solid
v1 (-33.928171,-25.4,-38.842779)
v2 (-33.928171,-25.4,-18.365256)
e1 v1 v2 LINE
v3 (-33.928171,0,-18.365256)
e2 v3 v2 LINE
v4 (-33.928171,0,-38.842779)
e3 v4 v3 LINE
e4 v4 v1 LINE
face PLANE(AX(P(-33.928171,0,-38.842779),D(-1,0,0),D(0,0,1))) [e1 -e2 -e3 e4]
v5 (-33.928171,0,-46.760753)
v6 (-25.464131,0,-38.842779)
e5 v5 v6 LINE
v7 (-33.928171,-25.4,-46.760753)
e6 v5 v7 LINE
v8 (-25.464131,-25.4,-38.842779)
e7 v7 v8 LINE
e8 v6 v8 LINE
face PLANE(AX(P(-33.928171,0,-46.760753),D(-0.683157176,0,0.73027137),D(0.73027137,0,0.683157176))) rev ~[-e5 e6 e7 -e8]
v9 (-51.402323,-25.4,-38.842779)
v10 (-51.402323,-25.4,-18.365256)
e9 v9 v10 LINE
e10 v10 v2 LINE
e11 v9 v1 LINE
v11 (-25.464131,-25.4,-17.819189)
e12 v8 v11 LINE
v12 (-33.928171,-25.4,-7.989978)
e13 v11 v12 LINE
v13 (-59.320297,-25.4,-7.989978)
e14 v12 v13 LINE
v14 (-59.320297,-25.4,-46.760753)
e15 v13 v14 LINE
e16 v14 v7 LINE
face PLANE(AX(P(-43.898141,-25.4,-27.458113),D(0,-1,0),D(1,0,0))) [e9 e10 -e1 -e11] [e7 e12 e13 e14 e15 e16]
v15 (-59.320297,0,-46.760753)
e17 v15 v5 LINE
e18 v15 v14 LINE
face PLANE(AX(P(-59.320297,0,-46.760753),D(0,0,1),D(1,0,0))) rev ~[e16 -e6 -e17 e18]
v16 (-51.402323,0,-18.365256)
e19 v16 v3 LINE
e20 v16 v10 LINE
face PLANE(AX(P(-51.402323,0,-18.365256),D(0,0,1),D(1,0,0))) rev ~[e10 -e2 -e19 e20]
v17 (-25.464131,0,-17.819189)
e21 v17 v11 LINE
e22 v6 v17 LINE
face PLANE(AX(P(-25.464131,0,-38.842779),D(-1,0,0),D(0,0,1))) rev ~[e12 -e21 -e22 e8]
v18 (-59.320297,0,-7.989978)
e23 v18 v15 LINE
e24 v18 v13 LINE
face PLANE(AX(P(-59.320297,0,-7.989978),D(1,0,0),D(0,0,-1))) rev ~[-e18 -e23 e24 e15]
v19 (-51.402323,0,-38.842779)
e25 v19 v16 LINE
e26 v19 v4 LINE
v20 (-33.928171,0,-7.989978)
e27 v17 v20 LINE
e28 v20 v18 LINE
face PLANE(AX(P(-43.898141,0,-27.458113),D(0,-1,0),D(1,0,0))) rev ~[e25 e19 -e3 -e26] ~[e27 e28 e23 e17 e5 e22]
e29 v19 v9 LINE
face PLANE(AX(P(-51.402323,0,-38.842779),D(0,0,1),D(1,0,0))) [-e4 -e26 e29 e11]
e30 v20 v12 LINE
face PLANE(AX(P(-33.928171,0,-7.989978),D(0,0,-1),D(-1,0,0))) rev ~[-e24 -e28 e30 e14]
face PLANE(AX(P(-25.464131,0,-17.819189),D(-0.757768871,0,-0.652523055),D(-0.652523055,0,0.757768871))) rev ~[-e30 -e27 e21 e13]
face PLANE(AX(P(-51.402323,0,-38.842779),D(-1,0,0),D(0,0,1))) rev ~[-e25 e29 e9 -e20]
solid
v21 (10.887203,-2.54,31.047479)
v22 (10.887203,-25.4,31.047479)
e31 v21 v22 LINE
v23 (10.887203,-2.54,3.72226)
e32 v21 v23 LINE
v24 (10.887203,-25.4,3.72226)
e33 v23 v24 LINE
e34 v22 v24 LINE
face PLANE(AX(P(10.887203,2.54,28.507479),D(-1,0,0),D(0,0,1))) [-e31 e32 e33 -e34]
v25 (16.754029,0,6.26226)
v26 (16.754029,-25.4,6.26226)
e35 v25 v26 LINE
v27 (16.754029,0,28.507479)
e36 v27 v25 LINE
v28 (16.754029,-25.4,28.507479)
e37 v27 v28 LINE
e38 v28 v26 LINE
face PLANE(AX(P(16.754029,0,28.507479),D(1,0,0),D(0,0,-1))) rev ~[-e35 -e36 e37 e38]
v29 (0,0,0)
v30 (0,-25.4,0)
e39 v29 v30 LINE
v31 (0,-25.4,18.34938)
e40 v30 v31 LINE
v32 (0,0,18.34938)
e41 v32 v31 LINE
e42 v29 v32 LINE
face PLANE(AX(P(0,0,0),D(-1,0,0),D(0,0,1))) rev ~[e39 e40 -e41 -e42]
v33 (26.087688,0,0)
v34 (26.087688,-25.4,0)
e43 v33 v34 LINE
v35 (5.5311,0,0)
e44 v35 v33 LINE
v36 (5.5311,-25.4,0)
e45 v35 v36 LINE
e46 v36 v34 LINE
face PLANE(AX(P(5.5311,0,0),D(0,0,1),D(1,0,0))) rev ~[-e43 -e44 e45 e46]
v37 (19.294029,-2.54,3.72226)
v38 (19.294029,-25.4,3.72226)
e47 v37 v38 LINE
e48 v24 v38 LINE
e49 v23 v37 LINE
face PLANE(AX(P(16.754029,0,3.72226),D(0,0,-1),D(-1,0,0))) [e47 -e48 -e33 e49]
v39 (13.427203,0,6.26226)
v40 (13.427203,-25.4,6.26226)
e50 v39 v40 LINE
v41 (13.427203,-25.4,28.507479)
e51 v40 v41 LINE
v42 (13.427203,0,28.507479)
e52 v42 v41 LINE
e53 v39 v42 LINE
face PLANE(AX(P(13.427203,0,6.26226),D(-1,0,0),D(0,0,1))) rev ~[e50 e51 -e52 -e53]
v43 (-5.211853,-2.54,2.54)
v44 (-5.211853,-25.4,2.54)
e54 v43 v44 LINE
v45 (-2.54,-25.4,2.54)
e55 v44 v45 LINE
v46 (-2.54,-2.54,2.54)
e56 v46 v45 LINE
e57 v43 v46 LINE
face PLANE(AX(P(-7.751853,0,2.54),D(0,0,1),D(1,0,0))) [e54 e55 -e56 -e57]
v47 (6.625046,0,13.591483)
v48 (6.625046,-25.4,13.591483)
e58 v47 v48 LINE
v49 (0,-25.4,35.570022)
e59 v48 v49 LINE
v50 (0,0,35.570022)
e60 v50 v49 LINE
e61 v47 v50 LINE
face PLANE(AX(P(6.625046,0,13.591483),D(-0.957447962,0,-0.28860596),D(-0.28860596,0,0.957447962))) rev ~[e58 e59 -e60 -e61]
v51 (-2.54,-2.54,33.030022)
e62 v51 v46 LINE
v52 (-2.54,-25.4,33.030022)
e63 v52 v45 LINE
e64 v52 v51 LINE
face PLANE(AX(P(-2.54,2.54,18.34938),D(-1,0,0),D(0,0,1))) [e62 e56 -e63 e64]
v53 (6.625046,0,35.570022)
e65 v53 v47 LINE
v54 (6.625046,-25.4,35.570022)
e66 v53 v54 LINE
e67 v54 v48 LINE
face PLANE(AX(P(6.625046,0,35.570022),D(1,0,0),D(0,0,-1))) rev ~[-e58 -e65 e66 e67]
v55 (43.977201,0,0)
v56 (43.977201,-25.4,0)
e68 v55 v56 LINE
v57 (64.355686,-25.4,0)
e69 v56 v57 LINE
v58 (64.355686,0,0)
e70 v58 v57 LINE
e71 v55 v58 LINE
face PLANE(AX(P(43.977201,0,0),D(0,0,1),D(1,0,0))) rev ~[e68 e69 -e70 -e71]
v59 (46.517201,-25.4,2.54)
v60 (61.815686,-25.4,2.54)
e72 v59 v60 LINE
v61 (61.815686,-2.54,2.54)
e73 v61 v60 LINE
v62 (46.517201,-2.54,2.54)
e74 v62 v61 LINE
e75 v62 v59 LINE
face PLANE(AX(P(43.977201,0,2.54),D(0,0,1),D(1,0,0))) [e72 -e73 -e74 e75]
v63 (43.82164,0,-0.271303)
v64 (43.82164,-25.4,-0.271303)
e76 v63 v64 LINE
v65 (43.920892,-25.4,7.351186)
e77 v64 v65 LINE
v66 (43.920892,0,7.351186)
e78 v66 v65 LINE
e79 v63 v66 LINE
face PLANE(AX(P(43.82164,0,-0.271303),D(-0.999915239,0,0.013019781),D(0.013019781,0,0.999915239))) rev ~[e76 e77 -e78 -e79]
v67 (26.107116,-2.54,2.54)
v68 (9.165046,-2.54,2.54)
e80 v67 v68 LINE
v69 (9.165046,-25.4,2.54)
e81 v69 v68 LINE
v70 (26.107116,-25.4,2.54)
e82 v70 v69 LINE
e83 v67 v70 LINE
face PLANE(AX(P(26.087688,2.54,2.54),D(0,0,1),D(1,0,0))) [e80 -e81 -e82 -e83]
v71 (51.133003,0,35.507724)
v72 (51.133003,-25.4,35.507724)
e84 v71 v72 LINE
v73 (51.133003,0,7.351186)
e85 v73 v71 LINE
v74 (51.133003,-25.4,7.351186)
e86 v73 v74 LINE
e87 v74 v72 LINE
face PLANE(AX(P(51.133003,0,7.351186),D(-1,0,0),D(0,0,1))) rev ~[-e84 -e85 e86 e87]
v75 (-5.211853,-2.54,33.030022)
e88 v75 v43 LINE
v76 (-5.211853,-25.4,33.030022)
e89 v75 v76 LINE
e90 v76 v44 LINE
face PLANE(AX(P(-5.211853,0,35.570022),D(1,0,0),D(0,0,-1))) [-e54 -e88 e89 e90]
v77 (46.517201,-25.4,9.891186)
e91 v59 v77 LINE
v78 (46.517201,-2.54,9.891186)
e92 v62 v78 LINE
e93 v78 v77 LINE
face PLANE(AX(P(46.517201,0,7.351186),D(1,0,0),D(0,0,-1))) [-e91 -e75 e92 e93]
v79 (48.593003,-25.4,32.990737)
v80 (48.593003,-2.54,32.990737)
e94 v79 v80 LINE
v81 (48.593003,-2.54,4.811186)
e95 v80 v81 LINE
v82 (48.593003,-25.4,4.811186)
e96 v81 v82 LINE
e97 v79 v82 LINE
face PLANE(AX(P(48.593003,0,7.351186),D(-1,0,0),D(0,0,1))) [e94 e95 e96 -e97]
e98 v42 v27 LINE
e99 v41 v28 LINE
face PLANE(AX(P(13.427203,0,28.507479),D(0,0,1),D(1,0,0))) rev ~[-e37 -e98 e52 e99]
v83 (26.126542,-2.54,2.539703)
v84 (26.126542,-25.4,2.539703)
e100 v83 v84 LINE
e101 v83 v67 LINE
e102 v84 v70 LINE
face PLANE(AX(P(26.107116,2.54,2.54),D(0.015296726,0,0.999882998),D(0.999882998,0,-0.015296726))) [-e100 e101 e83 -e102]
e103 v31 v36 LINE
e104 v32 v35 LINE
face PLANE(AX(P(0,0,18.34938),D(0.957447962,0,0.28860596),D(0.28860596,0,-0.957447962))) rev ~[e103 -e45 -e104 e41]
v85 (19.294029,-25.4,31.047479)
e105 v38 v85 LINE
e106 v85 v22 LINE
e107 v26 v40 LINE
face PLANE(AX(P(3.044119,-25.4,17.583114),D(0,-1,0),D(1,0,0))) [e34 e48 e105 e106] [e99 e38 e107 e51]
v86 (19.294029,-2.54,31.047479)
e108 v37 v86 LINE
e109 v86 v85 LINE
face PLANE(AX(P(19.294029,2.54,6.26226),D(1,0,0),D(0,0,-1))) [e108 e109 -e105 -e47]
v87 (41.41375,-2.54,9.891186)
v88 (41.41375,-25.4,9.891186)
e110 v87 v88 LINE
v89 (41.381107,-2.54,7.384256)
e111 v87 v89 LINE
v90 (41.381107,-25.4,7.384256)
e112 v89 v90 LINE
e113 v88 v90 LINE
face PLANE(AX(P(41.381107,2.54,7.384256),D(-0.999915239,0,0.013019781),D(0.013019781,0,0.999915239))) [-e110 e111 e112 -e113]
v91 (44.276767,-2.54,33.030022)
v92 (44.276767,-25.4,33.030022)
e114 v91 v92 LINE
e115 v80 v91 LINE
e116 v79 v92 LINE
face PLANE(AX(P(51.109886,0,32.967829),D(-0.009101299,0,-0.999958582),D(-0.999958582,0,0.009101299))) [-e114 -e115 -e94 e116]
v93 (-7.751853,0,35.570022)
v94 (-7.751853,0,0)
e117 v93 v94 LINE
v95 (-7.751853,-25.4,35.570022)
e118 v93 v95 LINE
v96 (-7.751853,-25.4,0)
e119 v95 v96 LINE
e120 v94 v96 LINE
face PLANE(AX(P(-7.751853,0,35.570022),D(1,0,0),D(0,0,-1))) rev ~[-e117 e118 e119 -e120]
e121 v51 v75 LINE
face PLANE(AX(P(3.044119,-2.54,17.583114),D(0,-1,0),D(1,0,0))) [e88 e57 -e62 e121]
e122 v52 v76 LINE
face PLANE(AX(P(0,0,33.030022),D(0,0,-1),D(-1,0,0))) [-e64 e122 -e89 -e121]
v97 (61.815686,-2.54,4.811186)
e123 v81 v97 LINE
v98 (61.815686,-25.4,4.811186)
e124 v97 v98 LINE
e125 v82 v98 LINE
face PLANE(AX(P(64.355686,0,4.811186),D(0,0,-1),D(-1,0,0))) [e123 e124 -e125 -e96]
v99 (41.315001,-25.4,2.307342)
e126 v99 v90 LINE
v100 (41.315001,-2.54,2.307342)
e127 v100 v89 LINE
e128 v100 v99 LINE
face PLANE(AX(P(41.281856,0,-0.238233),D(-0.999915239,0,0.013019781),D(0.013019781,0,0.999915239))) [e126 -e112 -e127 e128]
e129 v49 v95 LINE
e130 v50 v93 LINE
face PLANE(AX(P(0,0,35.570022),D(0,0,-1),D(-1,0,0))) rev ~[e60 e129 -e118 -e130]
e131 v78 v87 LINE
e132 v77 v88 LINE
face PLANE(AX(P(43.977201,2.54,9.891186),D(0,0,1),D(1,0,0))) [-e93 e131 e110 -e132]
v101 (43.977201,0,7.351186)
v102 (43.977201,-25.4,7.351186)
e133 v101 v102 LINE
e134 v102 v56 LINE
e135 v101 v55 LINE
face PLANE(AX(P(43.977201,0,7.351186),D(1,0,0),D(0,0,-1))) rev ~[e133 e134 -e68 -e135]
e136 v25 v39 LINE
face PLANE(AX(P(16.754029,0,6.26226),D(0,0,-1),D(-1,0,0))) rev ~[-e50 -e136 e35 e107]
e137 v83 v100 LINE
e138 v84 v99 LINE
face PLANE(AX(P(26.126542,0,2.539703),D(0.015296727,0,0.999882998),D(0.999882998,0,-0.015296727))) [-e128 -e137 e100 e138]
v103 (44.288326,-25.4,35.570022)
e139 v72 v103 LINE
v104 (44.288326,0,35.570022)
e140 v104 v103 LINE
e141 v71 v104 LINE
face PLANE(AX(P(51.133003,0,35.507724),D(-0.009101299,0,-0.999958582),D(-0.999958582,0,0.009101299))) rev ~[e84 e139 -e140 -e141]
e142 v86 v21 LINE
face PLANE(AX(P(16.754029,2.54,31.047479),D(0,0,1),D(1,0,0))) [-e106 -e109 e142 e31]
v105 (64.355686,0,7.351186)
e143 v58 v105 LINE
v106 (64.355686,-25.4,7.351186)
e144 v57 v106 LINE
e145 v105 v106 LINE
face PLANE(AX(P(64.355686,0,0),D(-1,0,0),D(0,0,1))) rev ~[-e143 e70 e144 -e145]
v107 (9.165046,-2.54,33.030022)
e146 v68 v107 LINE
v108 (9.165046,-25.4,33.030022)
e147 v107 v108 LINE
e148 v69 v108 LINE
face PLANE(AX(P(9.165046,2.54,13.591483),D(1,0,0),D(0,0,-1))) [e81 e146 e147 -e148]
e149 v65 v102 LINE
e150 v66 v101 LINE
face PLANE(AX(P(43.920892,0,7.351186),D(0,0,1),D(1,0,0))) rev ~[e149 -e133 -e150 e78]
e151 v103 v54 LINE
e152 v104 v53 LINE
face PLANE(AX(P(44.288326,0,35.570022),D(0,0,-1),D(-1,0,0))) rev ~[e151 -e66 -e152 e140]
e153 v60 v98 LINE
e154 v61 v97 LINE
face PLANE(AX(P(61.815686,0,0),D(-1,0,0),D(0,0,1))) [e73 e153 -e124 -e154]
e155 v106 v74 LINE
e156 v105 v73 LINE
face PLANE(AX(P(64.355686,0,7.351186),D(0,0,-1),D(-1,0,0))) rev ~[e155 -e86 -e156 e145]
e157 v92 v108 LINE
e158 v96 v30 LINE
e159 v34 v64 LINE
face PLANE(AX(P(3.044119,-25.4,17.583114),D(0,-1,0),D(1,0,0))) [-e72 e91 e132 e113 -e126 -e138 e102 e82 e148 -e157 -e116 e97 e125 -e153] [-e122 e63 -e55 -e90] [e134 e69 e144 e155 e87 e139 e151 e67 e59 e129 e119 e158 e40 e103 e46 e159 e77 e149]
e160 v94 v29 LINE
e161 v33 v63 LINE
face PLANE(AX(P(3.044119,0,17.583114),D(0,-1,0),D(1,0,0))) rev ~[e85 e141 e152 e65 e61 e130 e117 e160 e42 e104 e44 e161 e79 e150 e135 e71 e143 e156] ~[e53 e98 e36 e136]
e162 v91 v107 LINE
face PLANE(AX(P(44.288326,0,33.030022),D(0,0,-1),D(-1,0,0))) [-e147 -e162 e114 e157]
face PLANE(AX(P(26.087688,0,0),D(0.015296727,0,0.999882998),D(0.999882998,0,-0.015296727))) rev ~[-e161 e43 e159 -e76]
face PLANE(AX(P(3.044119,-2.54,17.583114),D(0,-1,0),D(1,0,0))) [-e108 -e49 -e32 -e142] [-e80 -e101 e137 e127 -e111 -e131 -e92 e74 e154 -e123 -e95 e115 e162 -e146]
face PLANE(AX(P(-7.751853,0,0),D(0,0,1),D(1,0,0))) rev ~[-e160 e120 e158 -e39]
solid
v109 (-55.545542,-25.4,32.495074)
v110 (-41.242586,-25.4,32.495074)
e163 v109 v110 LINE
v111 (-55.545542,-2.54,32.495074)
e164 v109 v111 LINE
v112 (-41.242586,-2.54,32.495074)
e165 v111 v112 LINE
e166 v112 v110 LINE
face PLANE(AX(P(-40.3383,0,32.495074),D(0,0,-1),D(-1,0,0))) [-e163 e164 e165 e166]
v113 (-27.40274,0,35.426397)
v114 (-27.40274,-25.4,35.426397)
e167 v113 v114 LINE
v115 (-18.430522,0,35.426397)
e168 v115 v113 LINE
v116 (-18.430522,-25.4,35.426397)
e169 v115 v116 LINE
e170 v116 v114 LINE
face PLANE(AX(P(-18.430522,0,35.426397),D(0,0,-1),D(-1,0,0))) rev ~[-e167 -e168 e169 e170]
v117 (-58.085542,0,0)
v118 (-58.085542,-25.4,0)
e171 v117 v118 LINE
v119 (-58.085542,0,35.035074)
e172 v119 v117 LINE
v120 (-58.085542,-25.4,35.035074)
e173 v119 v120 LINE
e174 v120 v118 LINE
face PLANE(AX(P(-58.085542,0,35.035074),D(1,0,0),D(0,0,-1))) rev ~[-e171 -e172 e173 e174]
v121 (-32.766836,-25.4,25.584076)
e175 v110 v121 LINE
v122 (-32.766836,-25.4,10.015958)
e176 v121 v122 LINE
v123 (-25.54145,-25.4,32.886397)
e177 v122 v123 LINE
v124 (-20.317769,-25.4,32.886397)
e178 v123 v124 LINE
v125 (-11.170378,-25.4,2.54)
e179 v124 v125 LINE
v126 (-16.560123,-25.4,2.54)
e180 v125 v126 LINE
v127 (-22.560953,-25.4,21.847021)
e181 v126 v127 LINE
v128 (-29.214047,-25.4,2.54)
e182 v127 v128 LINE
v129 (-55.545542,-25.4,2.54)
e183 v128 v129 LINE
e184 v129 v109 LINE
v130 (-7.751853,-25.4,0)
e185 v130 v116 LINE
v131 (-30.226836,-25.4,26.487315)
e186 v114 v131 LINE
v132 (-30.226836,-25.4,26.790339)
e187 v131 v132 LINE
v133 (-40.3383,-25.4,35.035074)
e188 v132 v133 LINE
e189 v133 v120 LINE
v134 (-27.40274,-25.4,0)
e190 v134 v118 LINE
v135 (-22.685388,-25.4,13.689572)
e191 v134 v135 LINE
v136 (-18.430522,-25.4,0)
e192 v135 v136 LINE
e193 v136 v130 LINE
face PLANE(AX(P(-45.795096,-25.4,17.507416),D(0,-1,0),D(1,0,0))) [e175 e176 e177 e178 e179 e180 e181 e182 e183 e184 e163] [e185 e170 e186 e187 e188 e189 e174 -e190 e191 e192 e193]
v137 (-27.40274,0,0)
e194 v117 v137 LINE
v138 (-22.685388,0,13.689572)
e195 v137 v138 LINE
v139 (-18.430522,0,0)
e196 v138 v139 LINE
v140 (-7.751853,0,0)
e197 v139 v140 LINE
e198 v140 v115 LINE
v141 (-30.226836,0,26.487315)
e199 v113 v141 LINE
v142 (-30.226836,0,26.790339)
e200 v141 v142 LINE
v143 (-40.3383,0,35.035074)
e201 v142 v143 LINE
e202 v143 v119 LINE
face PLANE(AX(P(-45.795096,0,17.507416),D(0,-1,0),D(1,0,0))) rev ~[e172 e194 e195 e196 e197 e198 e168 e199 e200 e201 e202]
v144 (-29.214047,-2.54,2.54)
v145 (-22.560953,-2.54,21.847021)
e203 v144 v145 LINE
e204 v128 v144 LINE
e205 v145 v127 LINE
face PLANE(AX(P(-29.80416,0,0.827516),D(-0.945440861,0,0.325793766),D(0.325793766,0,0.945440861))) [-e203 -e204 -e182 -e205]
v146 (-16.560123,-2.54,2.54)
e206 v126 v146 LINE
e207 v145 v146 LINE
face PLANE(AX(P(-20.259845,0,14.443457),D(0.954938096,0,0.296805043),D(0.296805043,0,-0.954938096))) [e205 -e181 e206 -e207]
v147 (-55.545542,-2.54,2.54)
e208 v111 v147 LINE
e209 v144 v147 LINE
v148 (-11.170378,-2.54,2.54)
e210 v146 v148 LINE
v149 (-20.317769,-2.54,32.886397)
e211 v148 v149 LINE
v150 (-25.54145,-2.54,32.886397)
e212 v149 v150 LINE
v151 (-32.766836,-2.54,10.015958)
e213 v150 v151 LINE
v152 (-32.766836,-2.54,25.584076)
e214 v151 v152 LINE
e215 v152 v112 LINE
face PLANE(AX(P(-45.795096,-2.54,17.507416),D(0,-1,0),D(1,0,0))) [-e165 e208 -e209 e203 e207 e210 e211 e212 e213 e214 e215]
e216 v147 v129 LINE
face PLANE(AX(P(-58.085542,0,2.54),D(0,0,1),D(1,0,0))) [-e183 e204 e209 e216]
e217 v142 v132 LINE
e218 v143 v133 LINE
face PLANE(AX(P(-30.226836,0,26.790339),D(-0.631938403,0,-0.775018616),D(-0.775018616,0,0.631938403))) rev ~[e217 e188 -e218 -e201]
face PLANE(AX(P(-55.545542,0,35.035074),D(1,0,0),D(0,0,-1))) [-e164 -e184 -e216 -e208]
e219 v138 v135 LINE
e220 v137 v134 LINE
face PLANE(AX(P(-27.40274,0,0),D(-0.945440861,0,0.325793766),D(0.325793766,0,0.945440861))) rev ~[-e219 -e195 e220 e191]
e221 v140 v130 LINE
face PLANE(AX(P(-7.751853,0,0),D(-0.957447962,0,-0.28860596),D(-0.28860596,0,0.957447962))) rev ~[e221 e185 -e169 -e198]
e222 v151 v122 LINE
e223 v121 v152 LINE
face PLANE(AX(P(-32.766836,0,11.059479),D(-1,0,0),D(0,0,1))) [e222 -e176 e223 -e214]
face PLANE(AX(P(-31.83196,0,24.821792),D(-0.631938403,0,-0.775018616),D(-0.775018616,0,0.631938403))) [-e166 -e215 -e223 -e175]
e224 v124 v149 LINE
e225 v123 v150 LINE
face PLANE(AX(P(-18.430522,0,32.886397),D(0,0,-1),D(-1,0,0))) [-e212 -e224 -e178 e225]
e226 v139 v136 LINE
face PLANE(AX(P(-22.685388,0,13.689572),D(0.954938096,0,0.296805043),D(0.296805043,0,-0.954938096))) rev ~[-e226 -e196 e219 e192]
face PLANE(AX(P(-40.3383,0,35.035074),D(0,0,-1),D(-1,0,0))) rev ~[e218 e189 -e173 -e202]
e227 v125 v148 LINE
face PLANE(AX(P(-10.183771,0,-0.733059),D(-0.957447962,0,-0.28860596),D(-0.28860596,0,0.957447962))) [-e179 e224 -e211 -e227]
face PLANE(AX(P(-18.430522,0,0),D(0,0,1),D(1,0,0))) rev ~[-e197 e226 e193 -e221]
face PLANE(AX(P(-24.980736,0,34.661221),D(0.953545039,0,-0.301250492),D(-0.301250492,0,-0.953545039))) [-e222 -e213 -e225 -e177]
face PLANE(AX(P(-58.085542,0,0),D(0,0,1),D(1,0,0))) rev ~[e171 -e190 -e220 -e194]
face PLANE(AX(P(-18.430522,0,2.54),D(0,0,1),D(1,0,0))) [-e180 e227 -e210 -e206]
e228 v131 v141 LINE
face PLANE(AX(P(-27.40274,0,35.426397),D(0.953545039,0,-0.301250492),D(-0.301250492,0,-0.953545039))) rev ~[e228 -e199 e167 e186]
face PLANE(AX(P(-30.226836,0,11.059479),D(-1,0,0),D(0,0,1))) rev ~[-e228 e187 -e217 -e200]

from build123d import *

# Parameters (mm, degrees)
F1_DEPTH    = 25.4
F3_DEPTH    = 25.4
F4_T        = -2.54
F5_T        = 2.54
F5_T3_DEPTH = 30.48
F6_W        = 17.4741521478
F6_H        = 20.4775221646
F7_DEPTH    = 25.4


# Not quite as in the source:
# - a shell that OpenCascade refuses in one call is made with other operations: the cavity is built on its own and cut out


with BuildPart() as f1:
    # F0 (on Front) → F1 (new body)
    with BuildSketch(Plane.XZ):
        Polygon((-7.751853343, 35.5700217187), (-7.751853343, 0), (0, 0), (0, 18.349380202), (5.5311000617, 0), (13.4272025898, 0), (13.4272025898, 5.9511377476), (13.4272025898, 6.2622595578), (13.4272025898, 28.5074785352), (13.4272025898, 35.5700217187), (6.6250464879, 35.5700217187), (6.6250464879, 13.591483), (0, 35.5700217187), align=None)
        Polygon((13.4272025898, 5.9511377476), (13.4272025898, 0), (26.0876882821, 0), (43.8216403127, -0.2713031718), (43.9208918573, 7.3511856608), (44.1983910351, 28.6630392075), (44.2883260548, 35.5700217187), (26.0876882821, 35.5700217187), (13.4272025898, 35.5700217187), (13.4272025898, 28.5074785352), (16.7540293187, 28.5074785352), (16.7540293187, 6.2622595578), (13.4272025898, 6.2622595578), align=None)
        Polygon((51.1330030859, 35.5077236891), (44.2883260548, 35.5700217187), (44.2883260548, 28.6630392075), (44.1983910351, 28.6630392075), (43.9208918573, 7.3511856608), (43.977200985, 7.3511856608), (43.977200985, 0), (64.355686307, 0), (64.355686307, 7.3511856608), (51.1330030859, 7.3511856608), align=None)
        Polygon((44.2883260548, 28.6630392075), (44.2883260548, 35.5700217187), (44.1983910351, 28.6630392075), align=None)
    extrude(amount=F1_DEPTH)

    # F5: shell of thickness 2.54, made by hand


with BuildPart() as f1b:
    # F0 (on Front) → F1, piece 2 (new body)
    with BuildSketch(Plane.XZ):
        Polygon((-27.4027399719, 35.4263968766), (-38.5948903859, 0), (-27.4027399719, 0), (-22.6853881031, 13.6895719916), (-18.4305217117, 0), (-7.751853343, 0), (-18.4305217117, 35.4263968766), align=None)
    extrude(amount=F1_DEPTH)

    # F2 (on Front) → F3 (join)
    with BuildSketch(Plane.XZ):
        Polygon((-58.0855421722, 35.0350737572), (-58.0855421722, 0), (-38.4715683758, 0), (-30.226835981, 11.0594791437), (-30.226835981, 26.7903394997), (-40.3383001685, 35.0350737572), align=None)
    extrude(amount=F3_DEPTH)

    # F4
    f4_openings = [f1b.faces().sort_by_distance(p)[0] for p in [
        (-36.054344, -25.4, 16.831568),
    ]]
    offset(amount=F4_T, openings=f4_openings, kind=Kind.INTERSECTION)


with BuildPart() as f5_core1:
    # F5_t2: copy of F1
    add(f1.part)

    # the walls: a layer under each face that stays
    f5_faces = [f5_core1.faces().sort_by_distance(p)[0] for p in [
        (47.7106645703, -12.7, 35.5388727039),
        (25.4566862714, -12.7, 35.5700217187),
        (6.6250464879, -12.7, 24.5807523594),
        (3.3125232439, -12.7, 24.5807523594),
        (-3.8759266715, -12.7, 35.5700217187),
        (-7.751853343, -12.7, 17.7850108594),
        (-3.8759266715, -12.7, 0),
        (0, -12.7, 9.174690101),
        (2.7655500308, -12.7, 9.174690101),
        (15.8093941719, -12.7, 0),
        (34.9546642974, -12.7, -0.1356515859),
        (43.871266085, -12.7, 3.5399412445),
        (43.9490464211, -12.7, 7.3511856608),
        (43.977200985, -12.7, 3.6755928304),
        (54.166443646, -12.7, 0),
        (64.355686307, -12.7, 3.6755928304),
        (57.7443446964, -12.7, 7.3511856608),
        (51.1330030859, -12.7, 21.4294546749),
        (13.4272025898, -12.7, 17.3848690465),
        (15.0906159543, -12.7, 28.5074785352),
        (16.7540293187, -12.7, 17.3848690465),
        (15.0906159543, -12.7, 6.2622595578),
        (28.301916482, 0, 17.6493592735),
    ]]
    thicken(f5_faces, amount=-F5_T, mode=Mode.SUBTRACT)

    # F5_s4 → F5_t3 (cut)
    with BuildSketch(Plane.XZ.offset(-2.54)):
        Polygon((6.6239656661, 13.5988135914), (9.1650464879, 13.591483), (9.1650464879, -3.6358737387), (4.1931286643, 12.8584238625), align=None)
        Polygon((0.0010808218, 18.3420496106), (-2.54, 18.349380202), (-2.54, 35.5767369407), (2.4319178236, 19.0824393395), align=None)
        Polygon((26.0872997453, -0.0507970282), (26.0876882821, 2.54), (26.1071162624, 2.54), (26.1265419696, 2.5397028155), align=None)
        Polygon((43.9462897044, 7.3254549584), (41.3811071501, 7.3842559035), (41.4137495922, 9.8911856608), (43.9208918573, 9.8911856608), align=None)
        Polygon((43.951800985, 7.3257856608), (43.977200985, 9.8911856608), (46.517200985, 9.8911856608), (46.517200985, 7.3511856608), align=None)
        Polygon((51.1584030859, 7.3765856608), (51.1330030859, 4.8111856608), (48.5930030859, 4.8111856608), (48.5930030859, 7.3511856608), align=None)
        Polygon((13.4526025898, 6.2876595578), (10.8872025898, 6.2622595578), (10.8872025898, 3.7222595578), (13.4272025898, 3.7222595578), align=None)
        Polygon((13.4526025898, 28.4820785352), (10.8872025898, 28.5074785352), (10.8872025898, 31.0474785352), (13.4272025898, 31.0474785352), align=None)
        Polygon((16.7286293187, 28.4820785352), (16.7540293187, 31.0474785352), (19.2940293187, 31.0474785352), (19.2940293187, 28.5074785352), align=None)
        Polygon((16.7286293187, 6.2876595578), (19.2940293187, 6.2622595578), (19.2940293187, 3.7222595578), (16.7540293187, 3.7222595578), align=None)
    extrude(amount=F5_T3_DEPTH, mode=Mode.SUBTRACT)


with BuildPart() as f1_1:
    add(f1.part)

    # what is left inside the walls is the cavity
    f5_cavity = [f5_core1.part.solids().sort_by_distance(p)[0] for p in [
        (35.490366, -2.5654, 12.548235),
        (-5.186453, -17.78, 17.785011),
    ]]
    add(f5_cavity, mode=Mode.SUBTRACT)


with BuildPart() as f7:
    # F6 (on Front) → F7 (new body)
    with BuildSketch(Plane.XZ):
        Polygon((-33.9281708002, -7.9899784178), (-59.3202970922, -7.9899784178), (-59.3202970922, -46.7607527971), (-33.9281708002, -46.7607527971), (-25.4641305655, -38.8427786529), (-25.4641305655, -17.8191885352), align=None)
        with Locations((-42.6652468741, -28.6040175706)):
            Rectangle(F6_W, F6_H, mode=Mode.SUBTRACT)
    extrude(amount=F7_DEPTH)


solid = Compound([f1b.part, f1_1.part, f7.part])
